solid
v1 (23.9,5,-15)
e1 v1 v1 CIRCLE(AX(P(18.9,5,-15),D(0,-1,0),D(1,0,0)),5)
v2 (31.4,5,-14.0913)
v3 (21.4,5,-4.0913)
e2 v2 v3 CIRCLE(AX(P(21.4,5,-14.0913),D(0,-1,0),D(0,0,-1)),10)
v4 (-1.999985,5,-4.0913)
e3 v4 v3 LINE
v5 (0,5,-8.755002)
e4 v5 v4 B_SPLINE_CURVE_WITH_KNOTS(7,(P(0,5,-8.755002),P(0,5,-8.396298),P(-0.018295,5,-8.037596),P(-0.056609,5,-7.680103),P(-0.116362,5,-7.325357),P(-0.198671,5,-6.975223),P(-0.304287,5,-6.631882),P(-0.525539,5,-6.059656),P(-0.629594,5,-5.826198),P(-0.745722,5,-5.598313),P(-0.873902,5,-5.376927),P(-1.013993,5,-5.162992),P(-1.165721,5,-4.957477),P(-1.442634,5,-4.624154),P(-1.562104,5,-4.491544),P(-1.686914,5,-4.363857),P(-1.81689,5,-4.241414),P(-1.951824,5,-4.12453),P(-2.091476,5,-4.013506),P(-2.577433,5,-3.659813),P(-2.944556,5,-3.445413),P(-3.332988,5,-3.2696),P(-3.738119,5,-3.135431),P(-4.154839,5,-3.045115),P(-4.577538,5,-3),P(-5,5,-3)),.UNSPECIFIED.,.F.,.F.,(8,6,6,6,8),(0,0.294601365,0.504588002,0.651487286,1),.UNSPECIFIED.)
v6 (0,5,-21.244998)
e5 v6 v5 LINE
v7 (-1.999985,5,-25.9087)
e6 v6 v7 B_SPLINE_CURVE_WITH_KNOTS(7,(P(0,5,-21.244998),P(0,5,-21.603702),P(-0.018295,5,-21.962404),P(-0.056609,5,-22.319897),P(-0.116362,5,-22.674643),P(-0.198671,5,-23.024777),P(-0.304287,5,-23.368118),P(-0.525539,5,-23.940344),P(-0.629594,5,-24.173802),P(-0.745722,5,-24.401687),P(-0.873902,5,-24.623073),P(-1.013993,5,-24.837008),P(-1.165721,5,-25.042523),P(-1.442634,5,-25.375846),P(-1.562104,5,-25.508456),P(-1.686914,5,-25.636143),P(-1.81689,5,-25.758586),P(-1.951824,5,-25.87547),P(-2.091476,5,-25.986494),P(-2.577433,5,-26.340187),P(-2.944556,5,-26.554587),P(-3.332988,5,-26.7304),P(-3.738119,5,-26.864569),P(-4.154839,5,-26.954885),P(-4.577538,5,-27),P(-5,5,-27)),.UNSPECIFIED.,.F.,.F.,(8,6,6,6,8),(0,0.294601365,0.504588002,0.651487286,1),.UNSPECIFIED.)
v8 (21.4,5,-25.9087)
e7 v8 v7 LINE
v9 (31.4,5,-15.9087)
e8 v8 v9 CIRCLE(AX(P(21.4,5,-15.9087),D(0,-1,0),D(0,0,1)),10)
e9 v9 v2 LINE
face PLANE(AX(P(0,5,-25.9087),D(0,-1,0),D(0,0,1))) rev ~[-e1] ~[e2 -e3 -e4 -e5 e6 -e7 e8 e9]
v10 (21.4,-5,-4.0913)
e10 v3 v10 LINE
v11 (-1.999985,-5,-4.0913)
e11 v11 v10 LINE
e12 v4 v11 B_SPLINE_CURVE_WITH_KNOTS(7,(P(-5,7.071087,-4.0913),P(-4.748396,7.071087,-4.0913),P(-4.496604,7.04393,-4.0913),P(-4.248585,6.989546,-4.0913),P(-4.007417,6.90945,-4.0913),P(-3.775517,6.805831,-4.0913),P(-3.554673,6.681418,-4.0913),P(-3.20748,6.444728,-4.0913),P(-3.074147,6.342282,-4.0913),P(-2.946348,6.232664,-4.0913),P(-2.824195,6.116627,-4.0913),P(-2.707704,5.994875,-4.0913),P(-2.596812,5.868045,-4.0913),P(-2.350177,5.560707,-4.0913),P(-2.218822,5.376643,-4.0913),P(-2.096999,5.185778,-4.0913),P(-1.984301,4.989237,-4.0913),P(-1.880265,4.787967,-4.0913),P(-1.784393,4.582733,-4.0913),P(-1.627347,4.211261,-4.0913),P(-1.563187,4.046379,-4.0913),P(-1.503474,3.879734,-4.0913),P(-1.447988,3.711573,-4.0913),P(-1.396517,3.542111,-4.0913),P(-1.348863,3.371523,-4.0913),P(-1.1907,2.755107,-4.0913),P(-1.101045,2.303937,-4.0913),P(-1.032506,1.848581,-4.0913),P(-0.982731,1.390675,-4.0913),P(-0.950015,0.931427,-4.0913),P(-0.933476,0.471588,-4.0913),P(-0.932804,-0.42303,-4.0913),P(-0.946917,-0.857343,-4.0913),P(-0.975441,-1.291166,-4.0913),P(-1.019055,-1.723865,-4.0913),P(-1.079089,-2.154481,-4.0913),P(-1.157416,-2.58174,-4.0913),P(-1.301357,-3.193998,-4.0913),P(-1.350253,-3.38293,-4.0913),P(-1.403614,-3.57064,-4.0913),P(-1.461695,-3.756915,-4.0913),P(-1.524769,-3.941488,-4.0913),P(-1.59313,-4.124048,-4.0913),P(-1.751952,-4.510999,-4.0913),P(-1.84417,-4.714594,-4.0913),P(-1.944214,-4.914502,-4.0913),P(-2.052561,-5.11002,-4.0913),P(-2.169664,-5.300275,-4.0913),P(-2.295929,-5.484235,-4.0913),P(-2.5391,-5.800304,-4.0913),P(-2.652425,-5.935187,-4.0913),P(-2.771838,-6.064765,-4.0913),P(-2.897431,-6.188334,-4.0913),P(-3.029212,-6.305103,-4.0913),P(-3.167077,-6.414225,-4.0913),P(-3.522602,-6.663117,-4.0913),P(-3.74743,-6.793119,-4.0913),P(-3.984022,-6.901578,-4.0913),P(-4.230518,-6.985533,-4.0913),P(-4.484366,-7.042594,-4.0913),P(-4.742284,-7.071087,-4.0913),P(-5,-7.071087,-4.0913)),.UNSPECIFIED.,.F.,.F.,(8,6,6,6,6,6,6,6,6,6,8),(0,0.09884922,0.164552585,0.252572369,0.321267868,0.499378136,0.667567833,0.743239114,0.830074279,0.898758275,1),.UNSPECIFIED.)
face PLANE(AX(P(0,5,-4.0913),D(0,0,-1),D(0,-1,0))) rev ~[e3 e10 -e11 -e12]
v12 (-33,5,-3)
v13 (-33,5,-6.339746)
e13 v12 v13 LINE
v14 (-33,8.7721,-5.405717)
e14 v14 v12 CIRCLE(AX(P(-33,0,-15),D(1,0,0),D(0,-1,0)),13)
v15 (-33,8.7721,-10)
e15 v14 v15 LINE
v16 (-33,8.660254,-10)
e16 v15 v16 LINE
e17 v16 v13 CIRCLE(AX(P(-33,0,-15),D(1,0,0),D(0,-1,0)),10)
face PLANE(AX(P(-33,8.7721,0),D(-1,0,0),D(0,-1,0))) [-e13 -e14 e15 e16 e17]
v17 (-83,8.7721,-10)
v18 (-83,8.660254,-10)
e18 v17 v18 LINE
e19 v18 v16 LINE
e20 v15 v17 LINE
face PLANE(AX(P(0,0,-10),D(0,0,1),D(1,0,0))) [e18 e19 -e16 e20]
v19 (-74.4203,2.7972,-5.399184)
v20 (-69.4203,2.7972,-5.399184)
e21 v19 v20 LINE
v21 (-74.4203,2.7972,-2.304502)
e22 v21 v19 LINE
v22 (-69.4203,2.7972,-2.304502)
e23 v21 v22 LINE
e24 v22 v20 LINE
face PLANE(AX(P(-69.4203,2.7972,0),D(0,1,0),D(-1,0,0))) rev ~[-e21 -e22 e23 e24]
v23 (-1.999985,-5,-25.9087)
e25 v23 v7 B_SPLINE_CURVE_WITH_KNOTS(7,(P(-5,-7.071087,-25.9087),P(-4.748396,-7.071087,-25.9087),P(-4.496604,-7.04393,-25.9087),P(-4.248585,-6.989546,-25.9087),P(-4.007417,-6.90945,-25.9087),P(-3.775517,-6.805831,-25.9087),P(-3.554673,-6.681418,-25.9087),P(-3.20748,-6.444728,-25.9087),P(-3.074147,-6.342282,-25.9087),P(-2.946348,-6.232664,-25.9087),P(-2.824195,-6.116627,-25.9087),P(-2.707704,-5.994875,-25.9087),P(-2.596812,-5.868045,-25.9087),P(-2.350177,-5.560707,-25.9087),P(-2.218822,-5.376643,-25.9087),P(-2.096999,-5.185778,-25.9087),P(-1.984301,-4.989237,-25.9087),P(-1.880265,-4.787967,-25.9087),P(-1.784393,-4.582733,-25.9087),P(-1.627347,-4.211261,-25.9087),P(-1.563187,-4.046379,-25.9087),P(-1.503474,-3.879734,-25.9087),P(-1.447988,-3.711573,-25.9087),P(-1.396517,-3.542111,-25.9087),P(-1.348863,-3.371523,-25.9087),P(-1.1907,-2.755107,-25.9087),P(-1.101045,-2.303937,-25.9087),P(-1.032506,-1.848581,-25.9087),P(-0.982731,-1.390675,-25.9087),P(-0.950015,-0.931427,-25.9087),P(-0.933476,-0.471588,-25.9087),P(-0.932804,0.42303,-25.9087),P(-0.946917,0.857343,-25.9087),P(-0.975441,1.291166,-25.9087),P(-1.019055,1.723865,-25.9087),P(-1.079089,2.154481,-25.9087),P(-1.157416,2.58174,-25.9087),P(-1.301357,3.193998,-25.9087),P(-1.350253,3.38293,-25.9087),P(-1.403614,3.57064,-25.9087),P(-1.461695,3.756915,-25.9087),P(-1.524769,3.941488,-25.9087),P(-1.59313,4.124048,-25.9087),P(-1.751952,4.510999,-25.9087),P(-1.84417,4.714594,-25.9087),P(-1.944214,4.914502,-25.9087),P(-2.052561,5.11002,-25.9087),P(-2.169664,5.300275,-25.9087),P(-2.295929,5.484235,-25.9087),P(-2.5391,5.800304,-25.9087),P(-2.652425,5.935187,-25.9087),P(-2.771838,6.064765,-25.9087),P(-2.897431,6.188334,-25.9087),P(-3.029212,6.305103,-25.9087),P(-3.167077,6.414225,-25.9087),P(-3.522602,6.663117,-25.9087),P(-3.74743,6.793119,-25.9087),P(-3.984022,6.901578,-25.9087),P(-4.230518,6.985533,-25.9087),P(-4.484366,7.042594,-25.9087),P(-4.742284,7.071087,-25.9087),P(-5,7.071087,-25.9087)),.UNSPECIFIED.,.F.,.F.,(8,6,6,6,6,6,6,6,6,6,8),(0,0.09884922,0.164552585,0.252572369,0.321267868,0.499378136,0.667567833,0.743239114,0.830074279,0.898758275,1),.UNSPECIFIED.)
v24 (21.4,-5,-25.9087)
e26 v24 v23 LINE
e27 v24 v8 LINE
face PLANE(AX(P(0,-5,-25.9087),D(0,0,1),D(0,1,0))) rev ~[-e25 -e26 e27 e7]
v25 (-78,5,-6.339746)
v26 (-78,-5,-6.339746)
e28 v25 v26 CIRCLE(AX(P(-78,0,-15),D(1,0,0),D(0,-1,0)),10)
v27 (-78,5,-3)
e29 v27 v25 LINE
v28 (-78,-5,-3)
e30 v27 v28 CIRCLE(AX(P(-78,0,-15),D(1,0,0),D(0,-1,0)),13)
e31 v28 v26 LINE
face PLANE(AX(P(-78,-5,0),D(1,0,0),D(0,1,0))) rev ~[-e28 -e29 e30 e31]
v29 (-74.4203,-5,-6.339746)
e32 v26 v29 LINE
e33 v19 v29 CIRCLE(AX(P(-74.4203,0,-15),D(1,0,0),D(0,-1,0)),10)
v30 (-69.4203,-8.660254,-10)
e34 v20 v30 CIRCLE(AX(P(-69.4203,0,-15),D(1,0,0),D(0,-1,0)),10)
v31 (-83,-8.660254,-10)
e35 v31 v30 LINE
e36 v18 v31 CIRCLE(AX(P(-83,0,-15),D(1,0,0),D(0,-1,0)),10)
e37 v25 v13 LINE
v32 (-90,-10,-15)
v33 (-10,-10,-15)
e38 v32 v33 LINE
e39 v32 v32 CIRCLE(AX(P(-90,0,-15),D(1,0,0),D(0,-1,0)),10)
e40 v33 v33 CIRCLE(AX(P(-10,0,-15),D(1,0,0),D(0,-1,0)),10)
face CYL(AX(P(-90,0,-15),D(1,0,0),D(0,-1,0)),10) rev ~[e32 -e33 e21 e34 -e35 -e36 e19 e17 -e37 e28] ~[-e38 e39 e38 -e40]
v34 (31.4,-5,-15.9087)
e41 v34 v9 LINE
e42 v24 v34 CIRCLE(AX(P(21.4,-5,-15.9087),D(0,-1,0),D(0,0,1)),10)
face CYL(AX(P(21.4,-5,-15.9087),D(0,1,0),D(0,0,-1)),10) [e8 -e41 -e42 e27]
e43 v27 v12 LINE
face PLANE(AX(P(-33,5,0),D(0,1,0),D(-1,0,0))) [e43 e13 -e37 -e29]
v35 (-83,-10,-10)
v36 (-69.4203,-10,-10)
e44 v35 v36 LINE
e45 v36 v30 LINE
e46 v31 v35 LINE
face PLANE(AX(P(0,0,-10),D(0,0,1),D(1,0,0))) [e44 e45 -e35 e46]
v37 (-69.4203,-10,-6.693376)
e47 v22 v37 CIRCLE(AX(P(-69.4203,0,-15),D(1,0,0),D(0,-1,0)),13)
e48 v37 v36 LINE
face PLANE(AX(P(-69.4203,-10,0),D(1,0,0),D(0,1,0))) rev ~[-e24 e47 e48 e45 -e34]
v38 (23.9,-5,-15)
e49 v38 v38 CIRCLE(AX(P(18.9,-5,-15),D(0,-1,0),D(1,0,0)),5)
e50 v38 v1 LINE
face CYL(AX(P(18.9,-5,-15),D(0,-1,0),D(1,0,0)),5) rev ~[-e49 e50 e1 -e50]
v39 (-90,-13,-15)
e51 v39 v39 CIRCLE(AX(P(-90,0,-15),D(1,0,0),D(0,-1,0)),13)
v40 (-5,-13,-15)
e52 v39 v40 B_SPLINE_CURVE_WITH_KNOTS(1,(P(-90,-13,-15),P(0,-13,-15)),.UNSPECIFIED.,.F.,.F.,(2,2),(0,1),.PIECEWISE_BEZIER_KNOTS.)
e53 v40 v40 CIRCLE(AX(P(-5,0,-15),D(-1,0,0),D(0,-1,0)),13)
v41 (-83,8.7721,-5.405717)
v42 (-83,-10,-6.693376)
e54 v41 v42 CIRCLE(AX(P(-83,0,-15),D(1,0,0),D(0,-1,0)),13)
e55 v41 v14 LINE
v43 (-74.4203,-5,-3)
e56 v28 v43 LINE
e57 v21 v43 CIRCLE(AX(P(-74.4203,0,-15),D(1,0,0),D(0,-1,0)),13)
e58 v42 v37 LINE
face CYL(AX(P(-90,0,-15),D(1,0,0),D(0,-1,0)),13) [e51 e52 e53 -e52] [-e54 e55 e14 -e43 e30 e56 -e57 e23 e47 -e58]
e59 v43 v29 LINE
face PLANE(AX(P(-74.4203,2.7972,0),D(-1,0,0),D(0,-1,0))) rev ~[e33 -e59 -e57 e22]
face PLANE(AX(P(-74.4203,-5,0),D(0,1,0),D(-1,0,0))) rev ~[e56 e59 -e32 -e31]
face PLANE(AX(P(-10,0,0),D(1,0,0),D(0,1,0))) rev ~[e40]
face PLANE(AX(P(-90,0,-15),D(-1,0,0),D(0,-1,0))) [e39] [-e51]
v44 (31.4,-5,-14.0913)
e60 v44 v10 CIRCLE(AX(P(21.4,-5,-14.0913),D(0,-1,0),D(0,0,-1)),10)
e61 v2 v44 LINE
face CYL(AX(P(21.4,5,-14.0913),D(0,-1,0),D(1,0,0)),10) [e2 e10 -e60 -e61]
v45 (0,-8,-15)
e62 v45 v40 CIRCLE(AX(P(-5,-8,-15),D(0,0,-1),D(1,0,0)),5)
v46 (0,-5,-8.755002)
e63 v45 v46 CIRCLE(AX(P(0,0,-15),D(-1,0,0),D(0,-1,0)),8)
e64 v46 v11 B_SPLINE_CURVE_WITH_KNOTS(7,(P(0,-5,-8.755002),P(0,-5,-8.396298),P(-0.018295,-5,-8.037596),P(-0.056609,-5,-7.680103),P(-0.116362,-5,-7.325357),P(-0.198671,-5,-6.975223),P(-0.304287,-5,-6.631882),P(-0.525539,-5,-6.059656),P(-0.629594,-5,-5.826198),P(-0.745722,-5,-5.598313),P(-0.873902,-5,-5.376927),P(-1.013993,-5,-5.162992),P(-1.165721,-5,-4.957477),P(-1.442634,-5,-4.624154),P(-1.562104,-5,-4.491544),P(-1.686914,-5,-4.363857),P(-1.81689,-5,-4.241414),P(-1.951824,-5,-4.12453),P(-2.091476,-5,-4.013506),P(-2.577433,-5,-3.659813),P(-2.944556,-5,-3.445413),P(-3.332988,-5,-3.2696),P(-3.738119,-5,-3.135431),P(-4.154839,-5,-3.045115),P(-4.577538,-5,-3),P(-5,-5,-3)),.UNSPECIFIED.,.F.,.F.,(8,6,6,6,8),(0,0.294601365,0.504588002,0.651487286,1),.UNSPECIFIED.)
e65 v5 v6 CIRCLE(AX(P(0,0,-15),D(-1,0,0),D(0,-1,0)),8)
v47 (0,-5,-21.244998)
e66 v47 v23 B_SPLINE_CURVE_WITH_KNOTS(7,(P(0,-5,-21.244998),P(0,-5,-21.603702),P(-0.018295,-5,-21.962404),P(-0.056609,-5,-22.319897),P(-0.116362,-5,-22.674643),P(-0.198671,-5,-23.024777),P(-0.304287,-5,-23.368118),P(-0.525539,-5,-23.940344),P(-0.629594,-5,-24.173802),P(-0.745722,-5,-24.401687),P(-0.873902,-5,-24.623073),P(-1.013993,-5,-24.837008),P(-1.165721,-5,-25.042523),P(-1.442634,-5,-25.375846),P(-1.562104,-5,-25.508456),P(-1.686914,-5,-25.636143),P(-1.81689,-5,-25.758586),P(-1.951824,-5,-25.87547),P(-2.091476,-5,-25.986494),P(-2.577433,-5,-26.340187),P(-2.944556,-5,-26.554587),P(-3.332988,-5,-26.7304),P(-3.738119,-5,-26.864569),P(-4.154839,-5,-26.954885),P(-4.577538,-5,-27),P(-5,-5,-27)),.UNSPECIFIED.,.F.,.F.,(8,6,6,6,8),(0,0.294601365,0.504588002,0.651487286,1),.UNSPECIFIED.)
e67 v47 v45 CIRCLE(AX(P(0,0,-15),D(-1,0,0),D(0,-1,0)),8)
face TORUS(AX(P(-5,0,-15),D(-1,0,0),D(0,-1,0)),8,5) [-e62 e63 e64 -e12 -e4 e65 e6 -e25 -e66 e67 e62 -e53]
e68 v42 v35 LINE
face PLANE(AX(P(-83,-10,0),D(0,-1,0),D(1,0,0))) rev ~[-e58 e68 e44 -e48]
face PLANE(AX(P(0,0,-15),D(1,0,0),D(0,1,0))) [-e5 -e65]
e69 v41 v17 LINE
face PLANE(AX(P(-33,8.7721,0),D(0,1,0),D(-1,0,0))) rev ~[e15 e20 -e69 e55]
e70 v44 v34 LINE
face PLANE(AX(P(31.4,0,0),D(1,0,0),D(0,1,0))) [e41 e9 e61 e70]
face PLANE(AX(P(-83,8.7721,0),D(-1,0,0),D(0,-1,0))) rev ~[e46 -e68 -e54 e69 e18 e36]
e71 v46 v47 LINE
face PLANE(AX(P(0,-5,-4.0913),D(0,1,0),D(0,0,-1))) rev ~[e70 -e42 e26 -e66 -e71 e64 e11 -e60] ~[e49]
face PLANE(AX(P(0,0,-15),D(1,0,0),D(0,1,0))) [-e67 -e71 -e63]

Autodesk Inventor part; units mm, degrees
ref_plane "YZ Plane" through (0, 0, 0) normal (1, 0, 0) x (0, 1, 0)
sketch "Schizzo1" plane through (0, 0, 0) normal (0, 1, 0) x (-1, 0, 0)
  line L0 (0, 0) -> (0, -30)
  line L1 (0, -15) -> (90, -15)
  line L2 (100, 0) -> (100, -30)
  line L3 (0, -30) -> (100, -30)
  line L4 (100, 0) -> (0, 0)
  line L5 (100, -41.4573) -> (75, -41.4573)
  line L6 (75, -17) -> (85, -17)
  line L7 (75, -17) -> (75, -22)
  line L8 (85, -17) -> (85, -29.5)
  line L9 (75, -22) -> (80, -22)
  line L10 (80, -22) -> (80, -24.5)
  line L11 (80, -24.5) -> (5, -24.5)
  line L12 (85, -29.5) -> (5, -29.5)
  line L13 (5, -24.5) -> (5, -29.5)
  dimension "d0" = 30
  dimension "d1" = 90
  dimension "d5" = 25
  dimension "d6" = 17
  dimension "d7" = 10
  dimension "d8" = 5
  dimension "d9" = 12.5
  dimension "d10" = 5
  dimension "d11" = 2.5
  dimension "d13" = 80
  dimension "d16" = 75
  dimension "d76" = 100
sketch "Schizzo2" plane through (0, 0, 0) normal (1, 0, 0) x (0, 1, 0)
  circle A0 centre (0, -15) radius 13
  circle A1 centre (0, -15) radius 12
  line L0 (5, -4.0913) -> (-5, -4.0913)
  line L1 (-5, -4.0913) -> (-5, -25.9087)
  line L2 (-5, -25.9087) -> (5, -25.9087)
  line L3 (5, -25.9087) -> (5, -4.0913)
  point P0 (0, 0)
  dimension "d2" = 15
  dimension "d3" = 26
  dimension "d53" = 24
  dimension "d58" = 10
  dimension "d59" = 21.8174
ref_plane "Piano di lavoro1" through (-90, 0, -15) normal (-1, 0, 0) x (0, -1, 0)
sketch "Schizzo3" plane through (-90, 0, -15) normal (-1, 0, 0) x (0, -1, 0)
  circle A0 centre (0, 0) radius 13
  point P0 (0, 15)
  dimension "d4" = 26
loft "Loft1" add profiles "Schizzo3", "Schizzo2" contours all / A0 | A1 L3 | L0 A1 | L3 L2 L1 L0 | A1 L2 | L1 A1
shell "Svuotamento1" thickness 3 removed faces 2 at (0, 3.4665, -13.963) at (-90, -3.4665, -13.963)
ref_plane "Piano di lavoro3" through (0, 0, -30) normal (0, 0.4988877, -0.8666667) x (-1, 0, 0)
sketch "Schizzo11" plane through (0, 0, -30) normal (0, 0.4988877, -0.8666667) x (-1, 0, 0)
  point P0 (0, 14.9666)
extrude "Estrusione5" add sketch "Schizzo2" against normal blind 10 contours A1 L3 | L0 A1 | L3 L2 L1 L0 | A1 L2 | L1 A1
extrude "Estrusione6" add sketch "Schizzo2" along normal blind 31.4 contours L3 L2 L1 L0
fillet "Raccordo1" radius 10 1 edges at (31.4, 0, -25.9087)
fillet "Raccordo2" radius 10 1 edges at (31.4, 0, -4.0913)
sketch "Schizzo12" plane through (0, -5, -25.9087) normal (0, -1, 0) x (1, 0, 0)
  line L0 (0, 0) -> (21.4, 0) projected
  line L1 (6.4, 21.8172) -> (21.4, 21.8172)
  line L2 (31.4, 11.8174) -> (31.4, 10) projected
  circle A0 centre (18.9, 10.9087) radius 5
  line L3 (0, 25.9087) -> (0, -2.0913) projected
  point P0 (13.9, 21.8172)
  point P1 (31.4, 10.9087)
  point P2 (10.7, 0)
  point P3 (31.4, 10.9087)
  point P4 (0, -2.0913)
  dimension "d64" = 21.8172
  dimension "d70" = 10
  dimension "d71" = 12.5
  dimension "d72" = 10.9085
  dimension "d75" = 18.9
extrude "Estrusione7" cut sketch "Schizzo12" against normal blind 25
fillet "Raccordo3" radius 5 1 edges at (0, 13, -15)
sketch "Schizzo13" plane through (0, 0, 0) normal (0, 0, 1) x (1, 0, 0)
  line L0 (-33, 8.7721) -> (-83, 8.7721)
  line L1 (-90, 10) -> (-10, 10) projected
  line L2 (-33, 8.7721) -> (-33, 5)
  line L3 (-5, -13) -> (-5, 13) projected
  line L4 (-83, 8.7721) -> (-83, -10)
  line L5 (-83, -10) -> (-69.4203, -10)
  line L6 (-90, -10) -> (-10, -10) projected
  line L7 (-69.4203, -10) -> (-69.4203, 2.7972)
  line L8 (-69.4203, 2.7972) -> (-74.4203, 2.7972)
  line L9 (-74.4203, 2.7972) -> (-74.4203, -5)
  line L10 (-74.4203, -5) -> (-78, -5)
  line L11 (-78, -5) -> (-78, 5)
  line L12 (-33, 5) -> (-78, 5)
  point P0 (0, 0)
  point P1 (-33, 6.8861)
  dimension "d21" = 3
  dimension "d79" = 28
  dimension "d80" = 50
  dimension "d83" = 5
  dimension "d84" = 5
  dimension "d85" = 7.7972
  dimension "d86" = 5
  dimension "d87" = 5
extrude "Estrusione8" cut sketch "Schizzo13" against normal blind 10
properties part number "asteoscila1_(306)"
